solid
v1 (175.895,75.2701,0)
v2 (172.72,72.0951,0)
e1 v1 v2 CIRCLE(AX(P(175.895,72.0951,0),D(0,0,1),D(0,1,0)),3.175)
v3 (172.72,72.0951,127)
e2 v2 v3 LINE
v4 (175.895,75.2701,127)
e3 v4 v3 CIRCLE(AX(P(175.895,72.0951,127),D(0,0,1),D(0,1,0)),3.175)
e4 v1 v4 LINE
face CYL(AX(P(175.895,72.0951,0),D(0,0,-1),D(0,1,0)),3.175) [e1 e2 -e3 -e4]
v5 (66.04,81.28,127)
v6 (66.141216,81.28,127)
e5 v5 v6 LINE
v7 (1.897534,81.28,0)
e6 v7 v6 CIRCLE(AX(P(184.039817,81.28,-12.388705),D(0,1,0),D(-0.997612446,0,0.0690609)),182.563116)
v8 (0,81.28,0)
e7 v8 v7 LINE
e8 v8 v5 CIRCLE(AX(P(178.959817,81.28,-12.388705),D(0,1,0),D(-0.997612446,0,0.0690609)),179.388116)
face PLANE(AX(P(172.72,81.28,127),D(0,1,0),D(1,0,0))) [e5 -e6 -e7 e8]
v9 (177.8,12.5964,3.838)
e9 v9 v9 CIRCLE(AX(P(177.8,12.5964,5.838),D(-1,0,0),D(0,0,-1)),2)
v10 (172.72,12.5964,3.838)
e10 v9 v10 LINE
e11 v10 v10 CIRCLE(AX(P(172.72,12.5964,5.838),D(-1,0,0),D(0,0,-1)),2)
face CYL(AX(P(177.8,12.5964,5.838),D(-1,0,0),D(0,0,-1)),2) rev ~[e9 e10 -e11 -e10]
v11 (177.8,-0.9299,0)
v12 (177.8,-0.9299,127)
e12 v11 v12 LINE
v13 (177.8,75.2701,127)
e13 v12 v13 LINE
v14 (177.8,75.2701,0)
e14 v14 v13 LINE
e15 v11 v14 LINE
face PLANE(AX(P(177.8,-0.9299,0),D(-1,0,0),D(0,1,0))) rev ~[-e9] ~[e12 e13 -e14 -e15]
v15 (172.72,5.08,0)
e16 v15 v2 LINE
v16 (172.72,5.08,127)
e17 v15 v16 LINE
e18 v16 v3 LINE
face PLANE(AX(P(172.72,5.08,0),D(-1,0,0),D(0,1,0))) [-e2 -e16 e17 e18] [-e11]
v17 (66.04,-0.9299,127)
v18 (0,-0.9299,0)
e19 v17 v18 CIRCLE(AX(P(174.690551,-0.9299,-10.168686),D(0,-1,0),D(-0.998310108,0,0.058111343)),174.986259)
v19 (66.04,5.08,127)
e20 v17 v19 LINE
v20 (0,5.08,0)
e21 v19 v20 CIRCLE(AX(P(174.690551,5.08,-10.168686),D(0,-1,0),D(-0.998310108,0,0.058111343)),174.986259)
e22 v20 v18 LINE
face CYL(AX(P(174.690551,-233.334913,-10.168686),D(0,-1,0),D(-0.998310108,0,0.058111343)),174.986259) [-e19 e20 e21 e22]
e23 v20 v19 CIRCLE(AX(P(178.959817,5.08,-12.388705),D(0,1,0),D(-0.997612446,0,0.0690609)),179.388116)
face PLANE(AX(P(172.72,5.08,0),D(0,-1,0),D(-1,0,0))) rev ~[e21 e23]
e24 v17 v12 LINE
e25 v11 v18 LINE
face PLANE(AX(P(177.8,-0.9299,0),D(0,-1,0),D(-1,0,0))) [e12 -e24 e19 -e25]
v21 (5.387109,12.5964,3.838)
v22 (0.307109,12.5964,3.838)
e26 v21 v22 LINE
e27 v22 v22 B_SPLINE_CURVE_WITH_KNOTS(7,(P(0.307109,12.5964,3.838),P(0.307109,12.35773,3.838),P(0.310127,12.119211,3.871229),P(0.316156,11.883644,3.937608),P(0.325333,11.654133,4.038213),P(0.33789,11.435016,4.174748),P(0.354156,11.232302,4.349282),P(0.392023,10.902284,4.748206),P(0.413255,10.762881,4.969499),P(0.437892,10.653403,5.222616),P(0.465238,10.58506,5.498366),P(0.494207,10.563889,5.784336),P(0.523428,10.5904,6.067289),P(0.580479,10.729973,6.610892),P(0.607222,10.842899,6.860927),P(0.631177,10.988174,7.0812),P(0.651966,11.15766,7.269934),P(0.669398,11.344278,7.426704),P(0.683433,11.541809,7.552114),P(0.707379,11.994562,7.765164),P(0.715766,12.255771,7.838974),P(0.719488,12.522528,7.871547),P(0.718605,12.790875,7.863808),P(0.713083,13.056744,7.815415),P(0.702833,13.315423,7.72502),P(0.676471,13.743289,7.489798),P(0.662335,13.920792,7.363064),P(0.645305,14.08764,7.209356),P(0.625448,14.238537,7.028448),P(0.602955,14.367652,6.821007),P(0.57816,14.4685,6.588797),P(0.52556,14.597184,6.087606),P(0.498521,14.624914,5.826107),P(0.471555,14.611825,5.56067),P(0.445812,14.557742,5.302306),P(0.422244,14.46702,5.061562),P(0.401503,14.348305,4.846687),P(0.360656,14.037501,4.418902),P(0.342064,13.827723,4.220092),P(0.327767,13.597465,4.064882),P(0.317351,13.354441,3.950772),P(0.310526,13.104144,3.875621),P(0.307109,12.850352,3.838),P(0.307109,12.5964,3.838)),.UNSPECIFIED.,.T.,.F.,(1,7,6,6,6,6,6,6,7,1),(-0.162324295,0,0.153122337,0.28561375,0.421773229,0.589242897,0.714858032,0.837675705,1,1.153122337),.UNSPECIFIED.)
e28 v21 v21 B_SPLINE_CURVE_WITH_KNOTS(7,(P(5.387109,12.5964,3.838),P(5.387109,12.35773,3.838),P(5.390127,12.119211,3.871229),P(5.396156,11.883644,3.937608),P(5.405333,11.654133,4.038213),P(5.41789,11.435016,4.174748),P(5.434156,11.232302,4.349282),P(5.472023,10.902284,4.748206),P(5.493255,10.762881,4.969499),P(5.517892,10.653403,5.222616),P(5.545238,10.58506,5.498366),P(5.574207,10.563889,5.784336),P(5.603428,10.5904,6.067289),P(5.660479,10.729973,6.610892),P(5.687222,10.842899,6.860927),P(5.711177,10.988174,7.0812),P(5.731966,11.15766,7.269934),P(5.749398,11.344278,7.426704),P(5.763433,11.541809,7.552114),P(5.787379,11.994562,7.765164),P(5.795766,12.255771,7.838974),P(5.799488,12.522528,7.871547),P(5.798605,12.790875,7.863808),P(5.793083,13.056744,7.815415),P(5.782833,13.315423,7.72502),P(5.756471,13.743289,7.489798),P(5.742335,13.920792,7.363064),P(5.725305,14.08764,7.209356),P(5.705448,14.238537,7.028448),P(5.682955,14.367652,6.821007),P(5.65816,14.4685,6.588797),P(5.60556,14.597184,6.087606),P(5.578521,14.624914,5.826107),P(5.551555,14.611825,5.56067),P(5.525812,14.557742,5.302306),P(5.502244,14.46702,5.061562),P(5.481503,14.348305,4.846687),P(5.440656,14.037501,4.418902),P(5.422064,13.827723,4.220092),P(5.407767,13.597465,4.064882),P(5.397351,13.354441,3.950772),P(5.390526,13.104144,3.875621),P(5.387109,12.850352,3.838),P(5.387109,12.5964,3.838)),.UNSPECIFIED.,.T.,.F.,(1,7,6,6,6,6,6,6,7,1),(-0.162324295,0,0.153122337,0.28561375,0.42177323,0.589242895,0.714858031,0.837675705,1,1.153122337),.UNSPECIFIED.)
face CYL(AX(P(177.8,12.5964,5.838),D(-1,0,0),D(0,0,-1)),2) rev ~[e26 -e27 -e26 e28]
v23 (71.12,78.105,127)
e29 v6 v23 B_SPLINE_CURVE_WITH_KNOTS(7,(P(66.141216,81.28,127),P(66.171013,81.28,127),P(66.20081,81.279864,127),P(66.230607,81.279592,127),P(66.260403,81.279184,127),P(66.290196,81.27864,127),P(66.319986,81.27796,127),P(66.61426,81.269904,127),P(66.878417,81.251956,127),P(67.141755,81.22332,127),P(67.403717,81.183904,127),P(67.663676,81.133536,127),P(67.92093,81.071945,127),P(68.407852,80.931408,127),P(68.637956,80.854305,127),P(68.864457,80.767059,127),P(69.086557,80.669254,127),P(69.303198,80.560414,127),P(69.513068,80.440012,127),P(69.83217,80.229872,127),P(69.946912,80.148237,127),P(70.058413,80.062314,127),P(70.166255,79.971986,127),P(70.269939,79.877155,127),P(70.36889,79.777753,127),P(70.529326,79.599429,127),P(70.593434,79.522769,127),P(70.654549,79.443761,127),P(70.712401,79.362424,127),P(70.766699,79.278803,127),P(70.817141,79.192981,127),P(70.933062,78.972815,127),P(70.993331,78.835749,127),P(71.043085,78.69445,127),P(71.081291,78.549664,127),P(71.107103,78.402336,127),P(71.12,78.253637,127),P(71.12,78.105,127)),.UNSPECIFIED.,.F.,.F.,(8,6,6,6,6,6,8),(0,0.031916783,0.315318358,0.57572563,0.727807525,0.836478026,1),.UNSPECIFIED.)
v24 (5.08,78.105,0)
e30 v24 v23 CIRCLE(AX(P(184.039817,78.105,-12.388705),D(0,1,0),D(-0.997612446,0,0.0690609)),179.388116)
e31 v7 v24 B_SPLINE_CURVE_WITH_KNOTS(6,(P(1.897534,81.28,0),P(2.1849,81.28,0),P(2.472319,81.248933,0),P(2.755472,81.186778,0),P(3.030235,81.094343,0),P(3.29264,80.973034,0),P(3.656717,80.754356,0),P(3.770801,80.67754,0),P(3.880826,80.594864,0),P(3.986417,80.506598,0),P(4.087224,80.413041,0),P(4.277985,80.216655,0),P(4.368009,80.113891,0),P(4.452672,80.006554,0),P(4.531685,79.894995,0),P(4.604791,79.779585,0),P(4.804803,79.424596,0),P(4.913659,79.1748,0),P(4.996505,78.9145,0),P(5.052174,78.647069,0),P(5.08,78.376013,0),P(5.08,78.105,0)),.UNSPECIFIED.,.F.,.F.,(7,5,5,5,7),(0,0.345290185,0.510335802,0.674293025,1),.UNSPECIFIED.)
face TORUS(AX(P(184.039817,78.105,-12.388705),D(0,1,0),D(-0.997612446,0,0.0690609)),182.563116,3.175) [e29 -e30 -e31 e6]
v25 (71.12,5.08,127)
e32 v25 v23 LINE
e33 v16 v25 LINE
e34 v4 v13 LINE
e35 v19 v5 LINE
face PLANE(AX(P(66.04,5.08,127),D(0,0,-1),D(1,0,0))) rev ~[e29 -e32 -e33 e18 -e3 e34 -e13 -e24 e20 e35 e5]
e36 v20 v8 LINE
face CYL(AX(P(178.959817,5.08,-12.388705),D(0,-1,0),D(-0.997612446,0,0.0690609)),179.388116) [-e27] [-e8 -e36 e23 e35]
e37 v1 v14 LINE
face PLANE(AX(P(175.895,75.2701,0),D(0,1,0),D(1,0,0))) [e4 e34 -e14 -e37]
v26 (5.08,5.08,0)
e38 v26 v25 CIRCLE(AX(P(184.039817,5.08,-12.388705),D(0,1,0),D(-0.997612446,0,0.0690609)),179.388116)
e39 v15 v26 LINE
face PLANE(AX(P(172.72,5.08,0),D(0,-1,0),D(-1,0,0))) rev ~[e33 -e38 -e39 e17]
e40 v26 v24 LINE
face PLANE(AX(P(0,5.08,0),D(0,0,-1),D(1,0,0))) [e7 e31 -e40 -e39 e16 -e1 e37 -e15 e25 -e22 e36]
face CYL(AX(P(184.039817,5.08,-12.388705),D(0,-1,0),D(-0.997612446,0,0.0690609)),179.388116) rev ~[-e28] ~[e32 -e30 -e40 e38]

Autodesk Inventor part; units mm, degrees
ref_plane "YZ Plane" through (0, 0, 0) normal (1, 0, 0) x (0, 1, 0)
ref_plane "XZ Plane" through (0, 0, 0) normal (0, 1, 0) x (-1, 0, 0)
ref_plane "XY Plane" through (0, 0, 0) normal (0, 0, 1) x (1, 0, 0)
sketch "Sketch1" plane through (0, 0, 0) normal (0, 0, 1) x (1, 0, 0)
  line L0 (177.8, -0.9299) -> (0, -0.9299)
  line L1 (175.895, 75.2701) -> (177.8, 75.2701)
  line L2 (172.72, 5.08) -> (172.72, 72.0951)
  arc A0 (175.895, 75.2701) -> (172.72, 72.0951) centre (175.895, 72.0951) ccw
  line L3 (177.8, -0.9299) -> (177.8, 75.2701)
  line L4 (172.72, 5.08) -> (0, 5.08)
  line L5 (0, 5.08) -> (0, -0.9299)
  point P0 (172.72, 75.2701)
  dimension "d0" = 177.8
  dimension "d4" = 3.175
  dimension "d6" = 1.905
  dimension "d87" = 76.2
extrude "Extrusion1" add sketch "Sketch1" along normal blind 127
sketch "Sketch5" plane through (0, 5.08, 0) normal (0, 1, 0) x (1, 0, 0)
  line L0 (172.72, -127) -> (71.12, -127) construction
  line L1 (0, 0) -> (0, -127) projected
  line L2 (5.08, 0) -> (0, 0)
  arc A0 (0, 0) -> (66.04, -127) centre (174.6906, 10.1687) ccw
  line L3 (71.12, -127) -> (66.04, -127)
  line L4 (172.72, -127) -> (71.12, -127)
  line L5 (0, -127) -> (177.8, -127) projected
  line L6 (172.72, -127) -> (0, -127) projected
  dimension "d99" = 5.08
  dimension "d100" = 5.08
  dimension "d134" = 101.6
split body "Split2" sketch "Sketch5" result one side removed curves L2 A0 L3 removed pieces at (22.8484, 4.58, 104.8944)
sketch "Sketch10" plane through (172.72, 5.08, 127) normal (0, 1, 0) x (1, 0, 0)
  point P0 (-172.72, 127)
sketch "Sketch6" plane through (172.72, 5.08, 127) normal (0, 1, 0) x (1, 0, 0)
  line L0 (-106.68, 0) -> (-101.6, 0)
  line L1 (-172.72, 127) -> (0, 127) projected
  line L2 (-172.72, 127) -> (-167.64, 127)
  arc A0 (-172.72, 127) -> (-106.68, 0) centre (6.2398, 139.3887) ccw
  arc A1 (-167.64, 127) -> (-101.6, 0) centre (11.3198, 139.3887) ccw
  dimension "d135" = 5.08
extrude "Extrusion3" add sketch "Sketch6" along normal blind 76.2
hole "Hole2" at (177.8, 12.5964, 5.838) direction (-1, 0, 0) diameter 4 end through all
fillet "Fillet2" radius 3.175 1 edges at (24.8837, 81.28, 70.3725)
properties part number "Intake Back Panel Middle" material "ABS Plastic"
